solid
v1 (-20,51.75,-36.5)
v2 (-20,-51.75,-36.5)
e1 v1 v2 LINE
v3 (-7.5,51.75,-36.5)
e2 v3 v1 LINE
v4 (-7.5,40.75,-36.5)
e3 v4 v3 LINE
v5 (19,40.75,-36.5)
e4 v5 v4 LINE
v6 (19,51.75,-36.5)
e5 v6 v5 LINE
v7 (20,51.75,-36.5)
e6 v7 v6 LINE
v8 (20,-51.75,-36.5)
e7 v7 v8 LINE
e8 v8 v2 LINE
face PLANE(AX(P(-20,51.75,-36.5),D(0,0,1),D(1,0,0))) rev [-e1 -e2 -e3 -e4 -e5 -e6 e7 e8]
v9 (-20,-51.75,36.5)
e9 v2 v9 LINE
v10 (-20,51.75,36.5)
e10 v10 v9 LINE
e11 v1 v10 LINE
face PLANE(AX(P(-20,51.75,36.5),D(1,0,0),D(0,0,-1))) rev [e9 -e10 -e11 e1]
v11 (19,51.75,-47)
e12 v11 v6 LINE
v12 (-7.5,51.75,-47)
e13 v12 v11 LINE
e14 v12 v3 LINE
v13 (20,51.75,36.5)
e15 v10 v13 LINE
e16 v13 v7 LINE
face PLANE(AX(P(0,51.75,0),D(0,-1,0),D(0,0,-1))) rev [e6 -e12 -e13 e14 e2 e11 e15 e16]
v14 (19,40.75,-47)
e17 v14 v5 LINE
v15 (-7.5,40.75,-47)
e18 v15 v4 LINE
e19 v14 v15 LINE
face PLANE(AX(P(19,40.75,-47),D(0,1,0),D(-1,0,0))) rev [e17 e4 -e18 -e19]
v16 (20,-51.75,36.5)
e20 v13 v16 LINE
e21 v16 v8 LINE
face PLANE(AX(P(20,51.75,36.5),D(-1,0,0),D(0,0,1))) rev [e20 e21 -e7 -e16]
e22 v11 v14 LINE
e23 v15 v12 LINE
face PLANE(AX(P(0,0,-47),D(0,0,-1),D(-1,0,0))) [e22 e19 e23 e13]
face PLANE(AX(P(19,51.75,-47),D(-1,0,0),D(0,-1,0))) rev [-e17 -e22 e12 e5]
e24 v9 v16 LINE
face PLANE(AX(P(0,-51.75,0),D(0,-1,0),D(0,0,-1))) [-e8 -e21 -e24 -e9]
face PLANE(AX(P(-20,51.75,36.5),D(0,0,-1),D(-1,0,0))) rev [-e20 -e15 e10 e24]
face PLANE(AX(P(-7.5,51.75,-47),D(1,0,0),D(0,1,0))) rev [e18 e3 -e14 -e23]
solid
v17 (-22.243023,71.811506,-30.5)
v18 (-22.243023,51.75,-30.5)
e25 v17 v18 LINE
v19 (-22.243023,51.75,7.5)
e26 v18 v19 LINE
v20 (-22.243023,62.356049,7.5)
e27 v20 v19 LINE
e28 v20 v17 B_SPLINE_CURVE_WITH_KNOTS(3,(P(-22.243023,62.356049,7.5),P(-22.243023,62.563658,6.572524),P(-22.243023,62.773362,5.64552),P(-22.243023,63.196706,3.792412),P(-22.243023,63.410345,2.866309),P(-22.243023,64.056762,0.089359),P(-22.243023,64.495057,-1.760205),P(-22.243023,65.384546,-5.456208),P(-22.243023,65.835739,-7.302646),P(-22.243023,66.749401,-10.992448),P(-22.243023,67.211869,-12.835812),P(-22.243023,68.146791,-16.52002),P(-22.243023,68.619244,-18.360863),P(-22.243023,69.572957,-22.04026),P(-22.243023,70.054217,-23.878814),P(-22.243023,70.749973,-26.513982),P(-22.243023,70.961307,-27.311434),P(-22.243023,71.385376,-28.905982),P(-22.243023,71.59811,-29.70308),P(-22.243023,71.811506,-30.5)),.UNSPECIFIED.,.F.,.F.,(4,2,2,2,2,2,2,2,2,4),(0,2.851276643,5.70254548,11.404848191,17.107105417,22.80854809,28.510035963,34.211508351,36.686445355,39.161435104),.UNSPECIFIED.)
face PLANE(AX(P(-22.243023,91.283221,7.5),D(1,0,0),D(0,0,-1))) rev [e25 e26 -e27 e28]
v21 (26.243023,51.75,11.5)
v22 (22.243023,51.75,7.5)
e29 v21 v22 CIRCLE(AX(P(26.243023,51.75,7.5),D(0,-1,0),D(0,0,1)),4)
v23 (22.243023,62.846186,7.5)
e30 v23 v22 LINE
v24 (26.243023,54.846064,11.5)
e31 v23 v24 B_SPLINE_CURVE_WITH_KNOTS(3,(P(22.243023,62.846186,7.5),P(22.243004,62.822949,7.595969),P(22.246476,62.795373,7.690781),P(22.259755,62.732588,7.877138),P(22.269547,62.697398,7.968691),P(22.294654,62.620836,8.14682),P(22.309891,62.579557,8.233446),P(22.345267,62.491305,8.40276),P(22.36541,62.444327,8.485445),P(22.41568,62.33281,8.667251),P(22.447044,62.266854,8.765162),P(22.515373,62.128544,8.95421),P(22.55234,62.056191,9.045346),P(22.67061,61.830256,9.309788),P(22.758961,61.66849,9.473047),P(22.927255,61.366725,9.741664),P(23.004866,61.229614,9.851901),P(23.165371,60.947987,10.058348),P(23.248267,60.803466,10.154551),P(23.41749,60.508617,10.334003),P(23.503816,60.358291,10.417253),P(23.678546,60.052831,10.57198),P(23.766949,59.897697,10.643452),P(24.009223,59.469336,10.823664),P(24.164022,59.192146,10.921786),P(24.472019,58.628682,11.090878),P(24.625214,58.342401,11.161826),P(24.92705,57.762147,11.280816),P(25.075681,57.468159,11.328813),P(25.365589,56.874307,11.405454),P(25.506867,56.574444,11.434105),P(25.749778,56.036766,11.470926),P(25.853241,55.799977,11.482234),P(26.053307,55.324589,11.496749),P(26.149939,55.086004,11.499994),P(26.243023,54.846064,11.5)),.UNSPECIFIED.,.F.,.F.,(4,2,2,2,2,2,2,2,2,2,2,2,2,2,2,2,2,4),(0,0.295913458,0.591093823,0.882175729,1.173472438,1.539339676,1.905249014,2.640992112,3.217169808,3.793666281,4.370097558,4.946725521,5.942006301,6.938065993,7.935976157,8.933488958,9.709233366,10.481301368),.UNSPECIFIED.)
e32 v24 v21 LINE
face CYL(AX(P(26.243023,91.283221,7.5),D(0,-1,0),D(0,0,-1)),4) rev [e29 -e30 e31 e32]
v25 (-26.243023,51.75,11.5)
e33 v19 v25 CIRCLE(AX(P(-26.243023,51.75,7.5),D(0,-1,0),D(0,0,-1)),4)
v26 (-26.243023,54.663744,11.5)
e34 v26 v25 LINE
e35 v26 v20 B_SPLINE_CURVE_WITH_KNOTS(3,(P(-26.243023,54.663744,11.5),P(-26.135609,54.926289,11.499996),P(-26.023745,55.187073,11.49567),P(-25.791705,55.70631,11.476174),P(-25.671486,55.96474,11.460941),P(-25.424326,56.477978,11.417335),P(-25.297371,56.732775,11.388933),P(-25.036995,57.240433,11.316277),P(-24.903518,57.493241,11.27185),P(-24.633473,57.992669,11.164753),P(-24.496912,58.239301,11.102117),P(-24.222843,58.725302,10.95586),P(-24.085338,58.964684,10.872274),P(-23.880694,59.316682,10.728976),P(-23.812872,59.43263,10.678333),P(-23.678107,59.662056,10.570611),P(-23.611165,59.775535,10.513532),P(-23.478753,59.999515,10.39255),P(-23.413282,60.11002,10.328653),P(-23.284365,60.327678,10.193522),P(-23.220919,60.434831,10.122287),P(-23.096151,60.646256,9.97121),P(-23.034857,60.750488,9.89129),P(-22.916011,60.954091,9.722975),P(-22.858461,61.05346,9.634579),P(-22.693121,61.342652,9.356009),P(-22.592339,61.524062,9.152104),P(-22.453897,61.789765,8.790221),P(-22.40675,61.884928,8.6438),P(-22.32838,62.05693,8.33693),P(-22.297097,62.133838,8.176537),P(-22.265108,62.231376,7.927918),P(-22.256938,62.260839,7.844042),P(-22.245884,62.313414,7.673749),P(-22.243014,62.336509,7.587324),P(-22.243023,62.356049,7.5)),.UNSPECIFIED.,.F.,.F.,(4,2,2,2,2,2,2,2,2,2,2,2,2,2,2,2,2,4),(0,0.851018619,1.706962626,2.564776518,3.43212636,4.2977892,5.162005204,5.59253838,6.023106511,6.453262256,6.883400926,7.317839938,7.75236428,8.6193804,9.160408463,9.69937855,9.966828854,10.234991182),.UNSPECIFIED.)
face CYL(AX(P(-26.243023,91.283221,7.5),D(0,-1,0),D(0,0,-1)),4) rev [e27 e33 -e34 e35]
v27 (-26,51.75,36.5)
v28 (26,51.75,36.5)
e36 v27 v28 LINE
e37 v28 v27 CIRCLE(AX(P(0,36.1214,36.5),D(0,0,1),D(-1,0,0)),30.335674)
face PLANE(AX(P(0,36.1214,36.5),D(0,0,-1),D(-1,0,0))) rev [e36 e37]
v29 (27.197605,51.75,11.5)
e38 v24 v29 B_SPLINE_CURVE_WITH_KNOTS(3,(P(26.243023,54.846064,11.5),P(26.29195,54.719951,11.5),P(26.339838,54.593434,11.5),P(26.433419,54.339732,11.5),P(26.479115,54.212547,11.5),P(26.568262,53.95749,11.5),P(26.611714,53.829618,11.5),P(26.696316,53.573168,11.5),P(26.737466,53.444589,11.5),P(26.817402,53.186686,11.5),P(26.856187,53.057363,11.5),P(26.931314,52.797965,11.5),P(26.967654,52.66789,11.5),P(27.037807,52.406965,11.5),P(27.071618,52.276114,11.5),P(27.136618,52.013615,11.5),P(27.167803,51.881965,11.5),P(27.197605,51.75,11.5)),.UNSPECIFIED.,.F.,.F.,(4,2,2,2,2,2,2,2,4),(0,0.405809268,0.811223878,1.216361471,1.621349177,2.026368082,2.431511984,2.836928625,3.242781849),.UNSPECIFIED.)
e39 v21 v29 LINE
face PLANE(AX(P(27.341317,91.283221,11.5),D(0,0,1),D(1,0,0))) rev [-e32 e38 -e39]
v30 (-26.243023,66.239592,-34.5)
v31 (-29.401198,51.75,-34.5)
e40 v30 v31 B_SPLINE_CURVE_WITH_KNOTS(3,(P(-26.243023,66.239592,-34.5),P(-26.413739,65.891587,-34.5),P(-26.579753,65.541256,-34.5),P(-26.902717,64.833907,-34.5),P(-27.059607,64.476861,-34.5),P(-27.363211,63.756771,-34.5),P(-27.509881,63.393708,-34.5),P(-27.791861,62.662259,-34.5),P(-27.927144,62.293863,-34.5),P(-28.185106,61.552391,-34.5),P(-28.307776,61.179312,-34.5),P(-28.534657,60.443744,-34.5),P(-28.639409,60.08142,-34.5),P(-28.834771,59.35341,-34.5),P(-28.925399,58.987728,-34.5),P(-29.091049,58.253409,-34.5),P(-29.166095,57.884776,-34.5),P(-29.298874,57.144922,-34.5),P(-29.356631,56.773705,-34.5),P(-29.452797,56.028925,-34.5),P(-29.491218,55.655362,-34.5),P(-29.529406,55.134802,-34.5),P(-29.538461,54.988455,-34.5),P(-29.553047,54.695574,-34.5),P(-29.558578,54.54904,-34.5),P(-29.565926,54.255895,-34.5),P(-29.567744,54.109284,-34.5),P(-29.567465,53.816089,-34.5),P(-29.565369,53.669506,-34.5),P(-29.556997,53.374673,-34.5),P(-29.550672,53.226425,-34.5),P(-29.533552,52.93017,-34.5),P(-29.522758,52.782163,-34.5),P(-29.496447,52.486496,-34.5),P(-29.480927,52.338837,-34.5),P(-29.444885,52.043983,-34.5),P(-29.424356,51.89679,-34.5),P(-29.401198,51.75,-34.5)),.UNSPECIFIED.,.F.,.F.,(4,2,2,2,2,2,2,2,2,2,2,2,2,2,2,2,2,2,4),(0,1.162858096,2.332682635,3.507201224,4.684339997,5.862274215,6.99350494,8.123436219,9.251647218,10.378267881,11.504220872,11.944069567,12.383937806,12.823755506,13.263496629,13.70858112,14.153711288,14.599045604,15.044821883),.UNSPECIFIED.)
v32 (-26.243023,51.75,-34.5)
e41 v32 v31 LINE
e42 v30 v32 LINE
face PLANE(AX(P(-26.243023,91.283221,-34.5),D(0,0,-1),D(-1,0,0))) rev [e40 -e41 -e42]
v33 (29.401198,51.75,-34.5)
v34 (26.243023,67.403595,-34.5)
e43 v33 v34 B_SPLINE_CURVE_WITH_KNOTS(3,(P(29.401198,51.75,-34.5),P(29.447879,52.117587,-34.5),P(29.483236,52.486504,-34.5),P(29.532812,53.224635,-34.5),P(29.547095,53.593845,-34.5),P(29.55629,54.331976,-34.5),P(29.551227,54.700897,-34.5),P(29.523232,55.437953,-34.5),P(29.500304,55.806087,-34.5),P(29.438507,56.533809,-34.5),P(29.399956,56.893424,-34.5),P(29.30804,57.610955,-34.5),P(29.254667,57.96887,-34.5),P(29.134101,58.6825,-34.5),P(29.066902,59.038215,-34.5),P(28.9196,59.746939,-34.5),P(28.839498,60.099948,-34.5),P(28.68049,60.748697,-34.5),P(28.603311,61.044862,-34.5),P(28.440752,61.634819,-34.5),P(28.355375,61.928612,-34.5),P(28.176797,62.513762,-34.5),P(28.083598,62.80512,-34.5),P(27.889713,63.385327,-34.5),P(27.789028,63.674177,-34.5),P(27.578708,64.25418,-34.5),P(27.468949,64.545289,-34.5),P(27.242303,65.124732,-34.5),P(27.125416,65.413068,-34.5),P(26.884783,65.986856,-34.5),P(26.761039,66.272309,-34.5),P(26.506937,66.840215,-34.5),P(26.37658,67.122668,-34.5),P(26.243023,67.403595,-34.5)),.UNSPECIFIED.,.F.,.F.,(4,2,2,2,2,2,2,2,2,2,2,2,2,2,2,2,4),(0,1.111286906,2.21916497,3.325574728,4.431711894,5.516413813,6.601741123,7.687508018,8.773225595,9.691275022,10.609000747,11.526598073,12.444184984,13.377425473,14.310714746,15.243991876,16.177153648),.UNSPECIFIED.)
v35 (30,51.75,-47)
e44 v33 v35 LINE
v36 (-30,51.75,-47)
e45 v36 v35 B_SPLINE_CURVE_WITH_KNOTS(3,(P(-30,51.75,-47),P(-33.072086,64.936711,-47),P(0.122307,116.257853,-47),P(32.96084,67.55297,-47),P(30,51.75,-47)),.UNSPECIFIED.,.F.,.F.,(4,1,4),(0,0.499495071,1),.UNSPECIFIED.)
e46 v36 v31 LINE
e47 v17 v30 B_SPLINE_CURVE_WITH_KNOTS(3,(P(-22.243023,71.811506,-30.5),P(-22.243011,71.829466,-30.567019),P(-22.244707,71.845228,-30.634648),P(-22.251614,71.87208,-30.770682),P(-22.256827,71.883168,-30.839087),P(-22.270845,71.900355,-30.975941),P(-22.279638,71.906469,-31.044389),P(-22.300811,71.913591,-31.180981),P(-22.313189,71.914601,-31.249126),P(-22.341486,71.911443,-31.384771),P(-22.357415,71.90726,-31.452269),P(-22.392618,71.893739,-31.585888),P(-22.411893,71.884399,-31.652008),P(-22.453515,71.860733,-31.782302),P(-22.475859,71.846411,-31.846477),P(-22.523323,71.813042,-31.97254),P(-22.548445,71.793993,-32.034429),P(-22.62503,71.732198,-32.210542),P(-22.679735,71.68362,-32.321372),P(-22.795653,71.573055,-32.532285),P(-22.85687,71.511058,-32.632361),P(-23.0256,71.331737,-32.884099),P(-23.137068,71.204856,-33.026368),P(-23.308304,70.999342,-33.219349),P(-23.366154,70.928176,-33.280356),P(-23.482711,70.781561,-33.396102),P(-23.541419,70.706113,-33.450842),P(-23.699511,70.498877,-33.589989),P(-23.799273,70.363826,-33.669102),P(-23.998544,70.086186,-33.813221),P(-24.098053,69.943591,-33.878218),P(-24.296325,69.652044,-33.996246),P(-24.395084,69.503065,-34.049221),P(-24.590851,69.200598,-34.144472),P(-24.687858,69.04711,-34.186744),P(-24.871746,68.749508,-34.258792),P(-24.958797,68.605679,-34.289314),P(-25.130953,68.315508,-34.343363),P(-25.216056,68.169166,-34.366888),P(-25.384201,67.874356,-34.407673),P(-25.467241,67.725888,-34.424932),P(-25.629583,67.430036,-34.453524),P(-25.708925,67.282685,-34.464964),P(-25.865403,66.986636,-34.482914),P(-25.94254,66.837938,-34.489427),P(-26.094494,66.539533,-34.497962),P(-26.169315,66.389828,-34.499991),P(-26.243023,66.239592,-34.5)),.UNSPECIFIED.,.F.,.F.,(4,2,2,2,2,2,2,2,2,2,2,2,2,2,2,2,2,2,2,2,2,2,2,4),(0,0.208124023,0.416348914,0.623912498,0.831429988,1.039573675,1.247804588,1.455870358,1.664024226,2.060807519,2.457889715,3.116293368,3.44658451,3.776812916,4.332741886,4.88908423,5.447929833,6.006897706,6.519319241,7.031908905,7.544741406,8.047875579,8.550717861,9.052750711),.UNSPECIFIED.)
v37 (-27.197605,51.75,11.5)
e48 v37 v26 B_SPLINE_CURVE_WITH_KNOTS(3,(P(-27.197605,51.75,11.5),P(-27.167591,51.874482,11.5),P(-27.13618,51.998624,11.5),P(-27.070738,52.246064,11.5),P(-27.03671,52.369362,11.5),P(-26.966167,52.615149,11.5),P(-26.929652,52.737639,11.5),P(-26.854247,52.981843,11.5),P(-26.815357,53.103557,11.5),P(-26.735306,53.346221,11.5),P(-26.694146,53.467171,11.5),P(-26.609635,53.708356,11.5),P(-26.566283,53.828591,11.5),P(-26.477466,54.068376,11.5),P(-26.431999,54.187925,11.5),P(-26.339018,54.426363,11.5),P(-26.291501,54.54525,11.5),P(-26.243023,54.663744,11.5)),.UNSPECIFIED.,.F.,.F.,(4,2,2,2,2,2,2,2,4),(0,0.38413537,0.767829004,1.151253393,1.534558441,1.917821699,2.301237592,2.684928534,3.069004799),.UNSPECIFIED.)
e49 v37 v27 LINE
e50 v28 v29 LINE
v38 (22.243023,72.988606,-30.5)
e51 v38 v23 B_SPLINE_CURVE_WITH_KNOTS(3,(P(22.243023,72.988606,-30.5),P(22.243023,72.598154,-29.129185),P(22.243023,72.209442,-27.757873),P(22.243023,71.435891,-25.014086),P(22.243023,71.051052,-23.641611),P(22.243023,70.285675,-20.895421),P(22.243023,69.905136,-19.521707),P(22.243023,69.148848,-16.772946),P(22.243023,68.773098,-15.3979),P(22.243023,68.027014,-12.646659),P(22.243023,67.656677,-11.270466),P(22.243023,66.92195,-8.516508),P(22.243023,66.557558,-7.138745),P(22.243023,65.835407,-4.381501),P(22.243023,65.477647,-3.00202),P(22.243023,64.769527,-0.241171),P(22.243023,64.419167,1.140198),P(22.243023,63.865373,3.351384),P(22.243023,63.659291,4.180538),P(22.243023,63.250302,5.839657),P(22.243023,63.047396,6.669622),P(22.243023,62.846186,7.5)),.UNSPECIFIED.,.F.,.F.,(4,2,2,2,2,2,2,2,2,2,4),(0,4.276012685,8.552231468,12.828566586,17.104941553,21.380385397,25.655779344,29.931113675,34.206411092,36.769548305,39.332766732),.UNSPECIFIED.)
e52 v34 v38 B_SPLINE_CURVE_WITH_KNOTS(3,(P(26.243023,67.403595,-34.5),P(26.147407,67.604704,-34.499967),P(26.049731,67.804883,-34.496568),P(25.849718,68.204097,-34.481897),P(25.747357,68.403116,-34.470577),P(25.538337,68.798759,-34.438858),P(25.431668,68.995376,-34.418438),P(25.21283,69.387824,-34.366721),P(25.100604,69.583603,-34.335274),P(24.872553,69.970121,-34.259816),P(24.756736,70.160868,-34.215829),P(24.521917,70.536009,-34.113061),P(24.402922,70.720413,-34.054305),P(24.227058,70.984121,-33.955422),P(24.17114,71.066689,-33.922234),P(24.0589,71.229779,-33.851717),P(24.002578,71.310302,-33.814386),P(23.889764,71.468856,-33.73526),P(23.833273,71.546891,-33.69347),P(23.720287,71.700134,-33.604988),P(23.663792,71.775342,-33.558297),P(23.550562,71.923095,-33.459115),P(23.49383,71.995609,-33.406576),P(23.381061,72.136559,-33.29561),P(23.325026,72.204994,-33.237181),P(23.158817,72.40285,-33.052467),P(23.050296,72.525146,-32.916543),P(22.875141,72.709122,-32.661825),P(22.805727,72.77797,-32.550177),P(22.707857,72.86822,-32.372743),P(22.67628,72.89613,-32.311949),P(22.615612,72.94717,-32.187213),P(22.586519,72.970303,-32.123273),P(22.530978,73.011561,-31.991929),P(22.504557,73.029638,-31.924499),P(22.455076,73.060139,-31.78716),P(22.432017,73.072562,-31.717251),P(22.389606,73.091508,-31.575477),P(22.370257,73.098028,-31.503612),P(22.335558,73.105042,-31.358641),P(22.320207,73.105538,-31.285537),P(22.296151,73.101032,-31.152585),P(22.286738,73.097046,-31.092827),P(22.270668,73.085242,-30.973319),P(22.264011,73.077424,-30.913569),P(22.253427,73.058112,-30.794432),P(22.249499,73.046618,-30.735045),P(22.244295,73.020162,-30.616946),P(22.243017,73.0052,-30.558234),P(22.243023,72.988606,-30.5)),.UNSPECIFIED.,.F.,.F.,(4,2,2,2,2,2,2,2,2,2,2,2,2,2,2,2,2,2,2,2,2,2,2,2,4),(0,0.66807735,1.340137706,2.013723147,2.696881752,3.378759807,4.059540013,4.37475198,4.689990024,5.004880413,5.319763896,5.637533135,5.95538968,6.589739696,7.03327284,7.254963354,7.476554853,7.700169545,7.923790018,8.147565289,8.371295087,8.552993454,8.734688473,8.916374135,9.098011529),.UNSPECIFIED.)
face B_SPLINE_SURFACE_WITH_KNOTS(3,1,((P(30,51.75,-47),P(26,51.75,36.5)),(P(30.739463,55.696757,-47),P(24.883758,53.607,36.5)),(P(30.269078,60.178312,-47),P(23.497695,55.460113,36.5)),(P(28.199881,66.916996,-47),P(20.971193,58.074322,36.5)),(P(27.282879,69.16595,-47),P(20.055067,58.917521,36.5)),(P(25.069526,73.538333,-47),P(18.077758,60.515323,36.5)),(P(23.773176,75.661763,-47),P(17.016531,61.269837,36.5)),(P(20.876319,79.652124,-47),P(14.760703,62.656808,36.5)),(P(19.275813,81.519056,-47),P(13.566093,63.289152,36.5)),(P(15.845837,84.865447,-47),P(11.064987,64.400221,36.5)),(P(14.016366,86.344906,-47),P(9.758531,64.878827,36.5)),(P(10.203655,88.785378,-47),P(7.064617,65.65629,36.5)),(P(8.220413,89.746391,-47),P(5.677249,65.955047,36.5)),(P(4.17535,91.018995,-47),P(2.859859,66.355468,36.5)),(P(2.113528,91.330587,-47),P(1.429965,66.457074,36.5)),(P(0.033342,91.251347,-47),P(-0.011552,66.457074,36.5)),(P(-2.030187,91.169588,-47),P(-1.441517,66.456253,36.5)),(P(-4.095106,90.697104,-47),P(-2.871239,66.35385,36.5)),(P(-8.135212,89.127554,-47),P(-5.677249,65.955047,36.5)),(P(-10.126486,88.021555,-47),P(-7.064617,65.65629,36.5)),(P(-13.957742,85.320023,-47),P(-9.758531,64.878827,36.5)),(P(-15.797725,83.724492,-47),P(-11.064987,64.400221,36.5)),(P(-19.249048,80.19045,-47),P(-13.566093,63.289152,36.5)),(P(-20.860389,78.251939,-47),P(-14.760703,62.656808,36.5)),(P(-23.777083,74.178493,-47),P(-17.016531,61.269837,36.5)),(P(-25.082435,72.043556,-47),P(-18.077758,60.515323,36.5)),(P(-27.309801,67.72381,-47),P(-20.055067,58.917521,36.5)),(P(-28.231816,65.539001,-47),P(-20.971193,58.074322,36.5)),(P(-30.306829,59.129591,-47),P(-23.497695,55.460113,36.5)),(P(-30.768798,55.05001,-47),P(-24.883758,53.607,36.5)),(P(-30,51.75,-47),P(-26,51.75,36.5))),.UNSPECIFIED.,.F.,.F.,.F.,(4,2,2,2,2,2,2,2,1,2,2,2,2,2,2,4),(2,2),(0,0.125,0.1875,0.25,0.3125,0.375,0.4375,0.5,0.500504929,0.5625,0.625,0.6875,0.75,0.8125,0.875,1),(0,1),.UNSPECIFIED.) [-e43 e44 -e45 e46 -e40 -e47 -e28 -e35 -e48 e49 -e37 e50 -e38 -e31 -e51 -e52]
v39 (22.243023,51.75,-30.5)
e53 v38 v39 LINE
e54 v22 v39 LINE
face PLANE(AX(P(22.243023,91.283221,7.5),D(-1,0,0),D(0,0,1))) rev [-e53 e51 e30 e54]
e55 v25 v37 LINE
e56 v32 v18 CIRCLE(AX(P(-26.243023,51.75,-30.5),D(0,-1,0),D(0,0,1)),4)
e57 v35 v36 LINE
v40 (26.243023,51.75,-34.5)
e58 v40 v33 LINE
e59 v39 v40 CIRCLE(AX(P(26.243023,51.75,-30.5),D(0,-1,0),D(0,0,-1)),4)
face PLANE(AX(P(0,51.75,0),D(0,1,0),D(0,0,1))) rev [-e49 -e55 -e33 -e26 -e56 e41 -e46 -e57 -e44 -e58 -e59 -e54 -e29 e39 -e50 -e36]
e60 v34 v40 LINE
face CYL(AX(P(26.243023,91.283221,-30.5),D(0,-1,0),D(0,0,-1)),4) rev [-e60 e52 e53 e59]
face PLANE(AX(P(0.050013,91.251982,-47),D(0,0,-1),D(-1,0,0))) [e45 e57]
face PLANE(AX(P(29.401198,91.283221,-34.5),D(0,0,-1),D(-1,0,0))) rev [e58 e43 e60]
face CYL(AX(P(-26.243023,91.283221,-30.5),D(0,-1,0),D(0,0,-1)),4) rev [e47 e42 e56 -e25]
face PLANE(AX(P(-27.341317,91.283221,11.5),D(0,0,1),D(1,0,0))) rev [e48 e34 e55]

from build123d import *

# Parameters (mm, degrees)
SKETCH_1_W          = 40
SKETCH_1_H          = 73
EXTRUDE_1_DEPTH     = 51.75
SKETCH_2_W          = 26.5
SKETCH_2_H          = 11
EXTRUDE_2_DEPTH     = 10.5
CUT_EXTRUDE_1_DEPTH = 118.658825115


with BuildPart() as part:
    # 草图1 → 凸台-拉伸1 (new, symmetric)
    with BuildSketch(Plane(origin=(0, 0, 0), x_dir=(1, 0, 0), z_dir=(0, 1, 0))):
        Rectangle(SKETCH_1_W, SKETCH_1_H)
    extrude(amount=EXTRUDE_1_DEPTH, both=True)

    # 草图2 → 凸台-拉伸2 (add)
    with BuildSketch(Plane(origin=(0, 0, -36.5), x_dir=(-1, 0, 0), z_dir=(0, 0, -1))):
        with Locations((-5.75, 46.25)):
            Rectangle(SKETCH_2_W, SKETCH_2_H)
    extrude(amount=EXTRUDE_2_DEPTH)


with BuildPart() as body_2:
    # 草图3 → 放样1 section 0
    with BuildSketch(Plane(origin=(0, 0, -47), x_dir=(-1, 0, 0), z_dir=(0, 0, -1))):
        with BuildLine():
            Line((-30, 51.75), (30, 51.75))
            add(Edge.make_bspline(
                [(-30, 51.75), (-32.960840364, 67.552970125), (-0.122307099, 116.257852524), (33.072086404, 64.936710937), (30, 51.75)],
                knots=[0, 0, 0, 0, 0.500504929, 1, 1, 1, 1], degree=3))
        make_face()
    # 草图4 for 放样1 → 放样1 section 1
    with BuildSketch(Plane.XY.offset(36.5)):
        with BuildLine():
            Line((-26, 51.75), (26, 51.75))
            # circular arc as an exact rational Bezier (weights 1, cos(half-angle), 1)
            Bezier((26, 51.75), (0, 95.0040341), (-26, 51.75), weights=[1, 0.515188813, 1])
        make_face()
    loft()

    # 草图5 → 切除-拉伸1 (cut, through all)
    with BuildSketch(Plane.XZ.offset(-51.75)):
        with BuildLine():
            Line((-27.341317365, 11.5), (-26.243023445, 11.5))
            ThreePointArc((-26.243023445, 11.5), (-23.41459632, 10.328427125), (-22.243023445, 7.5))
            Line((-22.243023445, 7.5), (-22.243023445, -30.5))
            ThreePointArc((-22.243023445, -30.5), (-23.41459632, -33.328427125), (-26.243023445, -34.5))
            Line((-26.243023445, -34.5), (-29.401197605, -34.5))
            Line((-29.401197605, -34.5), (-36.989276173, -34.5))
            Line((-36.989276173, -34.5), (-36.989276173, 12.347472548))
            Line((-36.989276173, 12.347472548), (-27.341317365, 11.5))
        make_face()
        with BuildLine():
            Line((36.989276173, 12.347472548), (27.341317365, 11.5))
            Line((27.341317365, 11.5), (26.243023445, 11.5))
            ThreePointArc((26.243023445, 11.5), (23.41459632, 10.328427125), (22.243023445, 7.5))
            Line((22.243023445, 7.5), (22.243023445, -30.5))
            ThreePointArc((22.243023445, -30.5), (23.41459632, -33.328427125), (26.243023445, -34.5))
            Line((26.243023445, -34.5), (29.401197605, -34.5))
            Line((29.401197605, -34.5), (36.989276173, -34.5))
            Line((36.989276173, -34.5), (36.989276173, 12.347472548))
        make_face()
    extrude(amount=-CUT_EXTRUDE_1_DEPTH, mode=Mode.SUBTRACT)


solid = Compound([part.part, body_2.part])
